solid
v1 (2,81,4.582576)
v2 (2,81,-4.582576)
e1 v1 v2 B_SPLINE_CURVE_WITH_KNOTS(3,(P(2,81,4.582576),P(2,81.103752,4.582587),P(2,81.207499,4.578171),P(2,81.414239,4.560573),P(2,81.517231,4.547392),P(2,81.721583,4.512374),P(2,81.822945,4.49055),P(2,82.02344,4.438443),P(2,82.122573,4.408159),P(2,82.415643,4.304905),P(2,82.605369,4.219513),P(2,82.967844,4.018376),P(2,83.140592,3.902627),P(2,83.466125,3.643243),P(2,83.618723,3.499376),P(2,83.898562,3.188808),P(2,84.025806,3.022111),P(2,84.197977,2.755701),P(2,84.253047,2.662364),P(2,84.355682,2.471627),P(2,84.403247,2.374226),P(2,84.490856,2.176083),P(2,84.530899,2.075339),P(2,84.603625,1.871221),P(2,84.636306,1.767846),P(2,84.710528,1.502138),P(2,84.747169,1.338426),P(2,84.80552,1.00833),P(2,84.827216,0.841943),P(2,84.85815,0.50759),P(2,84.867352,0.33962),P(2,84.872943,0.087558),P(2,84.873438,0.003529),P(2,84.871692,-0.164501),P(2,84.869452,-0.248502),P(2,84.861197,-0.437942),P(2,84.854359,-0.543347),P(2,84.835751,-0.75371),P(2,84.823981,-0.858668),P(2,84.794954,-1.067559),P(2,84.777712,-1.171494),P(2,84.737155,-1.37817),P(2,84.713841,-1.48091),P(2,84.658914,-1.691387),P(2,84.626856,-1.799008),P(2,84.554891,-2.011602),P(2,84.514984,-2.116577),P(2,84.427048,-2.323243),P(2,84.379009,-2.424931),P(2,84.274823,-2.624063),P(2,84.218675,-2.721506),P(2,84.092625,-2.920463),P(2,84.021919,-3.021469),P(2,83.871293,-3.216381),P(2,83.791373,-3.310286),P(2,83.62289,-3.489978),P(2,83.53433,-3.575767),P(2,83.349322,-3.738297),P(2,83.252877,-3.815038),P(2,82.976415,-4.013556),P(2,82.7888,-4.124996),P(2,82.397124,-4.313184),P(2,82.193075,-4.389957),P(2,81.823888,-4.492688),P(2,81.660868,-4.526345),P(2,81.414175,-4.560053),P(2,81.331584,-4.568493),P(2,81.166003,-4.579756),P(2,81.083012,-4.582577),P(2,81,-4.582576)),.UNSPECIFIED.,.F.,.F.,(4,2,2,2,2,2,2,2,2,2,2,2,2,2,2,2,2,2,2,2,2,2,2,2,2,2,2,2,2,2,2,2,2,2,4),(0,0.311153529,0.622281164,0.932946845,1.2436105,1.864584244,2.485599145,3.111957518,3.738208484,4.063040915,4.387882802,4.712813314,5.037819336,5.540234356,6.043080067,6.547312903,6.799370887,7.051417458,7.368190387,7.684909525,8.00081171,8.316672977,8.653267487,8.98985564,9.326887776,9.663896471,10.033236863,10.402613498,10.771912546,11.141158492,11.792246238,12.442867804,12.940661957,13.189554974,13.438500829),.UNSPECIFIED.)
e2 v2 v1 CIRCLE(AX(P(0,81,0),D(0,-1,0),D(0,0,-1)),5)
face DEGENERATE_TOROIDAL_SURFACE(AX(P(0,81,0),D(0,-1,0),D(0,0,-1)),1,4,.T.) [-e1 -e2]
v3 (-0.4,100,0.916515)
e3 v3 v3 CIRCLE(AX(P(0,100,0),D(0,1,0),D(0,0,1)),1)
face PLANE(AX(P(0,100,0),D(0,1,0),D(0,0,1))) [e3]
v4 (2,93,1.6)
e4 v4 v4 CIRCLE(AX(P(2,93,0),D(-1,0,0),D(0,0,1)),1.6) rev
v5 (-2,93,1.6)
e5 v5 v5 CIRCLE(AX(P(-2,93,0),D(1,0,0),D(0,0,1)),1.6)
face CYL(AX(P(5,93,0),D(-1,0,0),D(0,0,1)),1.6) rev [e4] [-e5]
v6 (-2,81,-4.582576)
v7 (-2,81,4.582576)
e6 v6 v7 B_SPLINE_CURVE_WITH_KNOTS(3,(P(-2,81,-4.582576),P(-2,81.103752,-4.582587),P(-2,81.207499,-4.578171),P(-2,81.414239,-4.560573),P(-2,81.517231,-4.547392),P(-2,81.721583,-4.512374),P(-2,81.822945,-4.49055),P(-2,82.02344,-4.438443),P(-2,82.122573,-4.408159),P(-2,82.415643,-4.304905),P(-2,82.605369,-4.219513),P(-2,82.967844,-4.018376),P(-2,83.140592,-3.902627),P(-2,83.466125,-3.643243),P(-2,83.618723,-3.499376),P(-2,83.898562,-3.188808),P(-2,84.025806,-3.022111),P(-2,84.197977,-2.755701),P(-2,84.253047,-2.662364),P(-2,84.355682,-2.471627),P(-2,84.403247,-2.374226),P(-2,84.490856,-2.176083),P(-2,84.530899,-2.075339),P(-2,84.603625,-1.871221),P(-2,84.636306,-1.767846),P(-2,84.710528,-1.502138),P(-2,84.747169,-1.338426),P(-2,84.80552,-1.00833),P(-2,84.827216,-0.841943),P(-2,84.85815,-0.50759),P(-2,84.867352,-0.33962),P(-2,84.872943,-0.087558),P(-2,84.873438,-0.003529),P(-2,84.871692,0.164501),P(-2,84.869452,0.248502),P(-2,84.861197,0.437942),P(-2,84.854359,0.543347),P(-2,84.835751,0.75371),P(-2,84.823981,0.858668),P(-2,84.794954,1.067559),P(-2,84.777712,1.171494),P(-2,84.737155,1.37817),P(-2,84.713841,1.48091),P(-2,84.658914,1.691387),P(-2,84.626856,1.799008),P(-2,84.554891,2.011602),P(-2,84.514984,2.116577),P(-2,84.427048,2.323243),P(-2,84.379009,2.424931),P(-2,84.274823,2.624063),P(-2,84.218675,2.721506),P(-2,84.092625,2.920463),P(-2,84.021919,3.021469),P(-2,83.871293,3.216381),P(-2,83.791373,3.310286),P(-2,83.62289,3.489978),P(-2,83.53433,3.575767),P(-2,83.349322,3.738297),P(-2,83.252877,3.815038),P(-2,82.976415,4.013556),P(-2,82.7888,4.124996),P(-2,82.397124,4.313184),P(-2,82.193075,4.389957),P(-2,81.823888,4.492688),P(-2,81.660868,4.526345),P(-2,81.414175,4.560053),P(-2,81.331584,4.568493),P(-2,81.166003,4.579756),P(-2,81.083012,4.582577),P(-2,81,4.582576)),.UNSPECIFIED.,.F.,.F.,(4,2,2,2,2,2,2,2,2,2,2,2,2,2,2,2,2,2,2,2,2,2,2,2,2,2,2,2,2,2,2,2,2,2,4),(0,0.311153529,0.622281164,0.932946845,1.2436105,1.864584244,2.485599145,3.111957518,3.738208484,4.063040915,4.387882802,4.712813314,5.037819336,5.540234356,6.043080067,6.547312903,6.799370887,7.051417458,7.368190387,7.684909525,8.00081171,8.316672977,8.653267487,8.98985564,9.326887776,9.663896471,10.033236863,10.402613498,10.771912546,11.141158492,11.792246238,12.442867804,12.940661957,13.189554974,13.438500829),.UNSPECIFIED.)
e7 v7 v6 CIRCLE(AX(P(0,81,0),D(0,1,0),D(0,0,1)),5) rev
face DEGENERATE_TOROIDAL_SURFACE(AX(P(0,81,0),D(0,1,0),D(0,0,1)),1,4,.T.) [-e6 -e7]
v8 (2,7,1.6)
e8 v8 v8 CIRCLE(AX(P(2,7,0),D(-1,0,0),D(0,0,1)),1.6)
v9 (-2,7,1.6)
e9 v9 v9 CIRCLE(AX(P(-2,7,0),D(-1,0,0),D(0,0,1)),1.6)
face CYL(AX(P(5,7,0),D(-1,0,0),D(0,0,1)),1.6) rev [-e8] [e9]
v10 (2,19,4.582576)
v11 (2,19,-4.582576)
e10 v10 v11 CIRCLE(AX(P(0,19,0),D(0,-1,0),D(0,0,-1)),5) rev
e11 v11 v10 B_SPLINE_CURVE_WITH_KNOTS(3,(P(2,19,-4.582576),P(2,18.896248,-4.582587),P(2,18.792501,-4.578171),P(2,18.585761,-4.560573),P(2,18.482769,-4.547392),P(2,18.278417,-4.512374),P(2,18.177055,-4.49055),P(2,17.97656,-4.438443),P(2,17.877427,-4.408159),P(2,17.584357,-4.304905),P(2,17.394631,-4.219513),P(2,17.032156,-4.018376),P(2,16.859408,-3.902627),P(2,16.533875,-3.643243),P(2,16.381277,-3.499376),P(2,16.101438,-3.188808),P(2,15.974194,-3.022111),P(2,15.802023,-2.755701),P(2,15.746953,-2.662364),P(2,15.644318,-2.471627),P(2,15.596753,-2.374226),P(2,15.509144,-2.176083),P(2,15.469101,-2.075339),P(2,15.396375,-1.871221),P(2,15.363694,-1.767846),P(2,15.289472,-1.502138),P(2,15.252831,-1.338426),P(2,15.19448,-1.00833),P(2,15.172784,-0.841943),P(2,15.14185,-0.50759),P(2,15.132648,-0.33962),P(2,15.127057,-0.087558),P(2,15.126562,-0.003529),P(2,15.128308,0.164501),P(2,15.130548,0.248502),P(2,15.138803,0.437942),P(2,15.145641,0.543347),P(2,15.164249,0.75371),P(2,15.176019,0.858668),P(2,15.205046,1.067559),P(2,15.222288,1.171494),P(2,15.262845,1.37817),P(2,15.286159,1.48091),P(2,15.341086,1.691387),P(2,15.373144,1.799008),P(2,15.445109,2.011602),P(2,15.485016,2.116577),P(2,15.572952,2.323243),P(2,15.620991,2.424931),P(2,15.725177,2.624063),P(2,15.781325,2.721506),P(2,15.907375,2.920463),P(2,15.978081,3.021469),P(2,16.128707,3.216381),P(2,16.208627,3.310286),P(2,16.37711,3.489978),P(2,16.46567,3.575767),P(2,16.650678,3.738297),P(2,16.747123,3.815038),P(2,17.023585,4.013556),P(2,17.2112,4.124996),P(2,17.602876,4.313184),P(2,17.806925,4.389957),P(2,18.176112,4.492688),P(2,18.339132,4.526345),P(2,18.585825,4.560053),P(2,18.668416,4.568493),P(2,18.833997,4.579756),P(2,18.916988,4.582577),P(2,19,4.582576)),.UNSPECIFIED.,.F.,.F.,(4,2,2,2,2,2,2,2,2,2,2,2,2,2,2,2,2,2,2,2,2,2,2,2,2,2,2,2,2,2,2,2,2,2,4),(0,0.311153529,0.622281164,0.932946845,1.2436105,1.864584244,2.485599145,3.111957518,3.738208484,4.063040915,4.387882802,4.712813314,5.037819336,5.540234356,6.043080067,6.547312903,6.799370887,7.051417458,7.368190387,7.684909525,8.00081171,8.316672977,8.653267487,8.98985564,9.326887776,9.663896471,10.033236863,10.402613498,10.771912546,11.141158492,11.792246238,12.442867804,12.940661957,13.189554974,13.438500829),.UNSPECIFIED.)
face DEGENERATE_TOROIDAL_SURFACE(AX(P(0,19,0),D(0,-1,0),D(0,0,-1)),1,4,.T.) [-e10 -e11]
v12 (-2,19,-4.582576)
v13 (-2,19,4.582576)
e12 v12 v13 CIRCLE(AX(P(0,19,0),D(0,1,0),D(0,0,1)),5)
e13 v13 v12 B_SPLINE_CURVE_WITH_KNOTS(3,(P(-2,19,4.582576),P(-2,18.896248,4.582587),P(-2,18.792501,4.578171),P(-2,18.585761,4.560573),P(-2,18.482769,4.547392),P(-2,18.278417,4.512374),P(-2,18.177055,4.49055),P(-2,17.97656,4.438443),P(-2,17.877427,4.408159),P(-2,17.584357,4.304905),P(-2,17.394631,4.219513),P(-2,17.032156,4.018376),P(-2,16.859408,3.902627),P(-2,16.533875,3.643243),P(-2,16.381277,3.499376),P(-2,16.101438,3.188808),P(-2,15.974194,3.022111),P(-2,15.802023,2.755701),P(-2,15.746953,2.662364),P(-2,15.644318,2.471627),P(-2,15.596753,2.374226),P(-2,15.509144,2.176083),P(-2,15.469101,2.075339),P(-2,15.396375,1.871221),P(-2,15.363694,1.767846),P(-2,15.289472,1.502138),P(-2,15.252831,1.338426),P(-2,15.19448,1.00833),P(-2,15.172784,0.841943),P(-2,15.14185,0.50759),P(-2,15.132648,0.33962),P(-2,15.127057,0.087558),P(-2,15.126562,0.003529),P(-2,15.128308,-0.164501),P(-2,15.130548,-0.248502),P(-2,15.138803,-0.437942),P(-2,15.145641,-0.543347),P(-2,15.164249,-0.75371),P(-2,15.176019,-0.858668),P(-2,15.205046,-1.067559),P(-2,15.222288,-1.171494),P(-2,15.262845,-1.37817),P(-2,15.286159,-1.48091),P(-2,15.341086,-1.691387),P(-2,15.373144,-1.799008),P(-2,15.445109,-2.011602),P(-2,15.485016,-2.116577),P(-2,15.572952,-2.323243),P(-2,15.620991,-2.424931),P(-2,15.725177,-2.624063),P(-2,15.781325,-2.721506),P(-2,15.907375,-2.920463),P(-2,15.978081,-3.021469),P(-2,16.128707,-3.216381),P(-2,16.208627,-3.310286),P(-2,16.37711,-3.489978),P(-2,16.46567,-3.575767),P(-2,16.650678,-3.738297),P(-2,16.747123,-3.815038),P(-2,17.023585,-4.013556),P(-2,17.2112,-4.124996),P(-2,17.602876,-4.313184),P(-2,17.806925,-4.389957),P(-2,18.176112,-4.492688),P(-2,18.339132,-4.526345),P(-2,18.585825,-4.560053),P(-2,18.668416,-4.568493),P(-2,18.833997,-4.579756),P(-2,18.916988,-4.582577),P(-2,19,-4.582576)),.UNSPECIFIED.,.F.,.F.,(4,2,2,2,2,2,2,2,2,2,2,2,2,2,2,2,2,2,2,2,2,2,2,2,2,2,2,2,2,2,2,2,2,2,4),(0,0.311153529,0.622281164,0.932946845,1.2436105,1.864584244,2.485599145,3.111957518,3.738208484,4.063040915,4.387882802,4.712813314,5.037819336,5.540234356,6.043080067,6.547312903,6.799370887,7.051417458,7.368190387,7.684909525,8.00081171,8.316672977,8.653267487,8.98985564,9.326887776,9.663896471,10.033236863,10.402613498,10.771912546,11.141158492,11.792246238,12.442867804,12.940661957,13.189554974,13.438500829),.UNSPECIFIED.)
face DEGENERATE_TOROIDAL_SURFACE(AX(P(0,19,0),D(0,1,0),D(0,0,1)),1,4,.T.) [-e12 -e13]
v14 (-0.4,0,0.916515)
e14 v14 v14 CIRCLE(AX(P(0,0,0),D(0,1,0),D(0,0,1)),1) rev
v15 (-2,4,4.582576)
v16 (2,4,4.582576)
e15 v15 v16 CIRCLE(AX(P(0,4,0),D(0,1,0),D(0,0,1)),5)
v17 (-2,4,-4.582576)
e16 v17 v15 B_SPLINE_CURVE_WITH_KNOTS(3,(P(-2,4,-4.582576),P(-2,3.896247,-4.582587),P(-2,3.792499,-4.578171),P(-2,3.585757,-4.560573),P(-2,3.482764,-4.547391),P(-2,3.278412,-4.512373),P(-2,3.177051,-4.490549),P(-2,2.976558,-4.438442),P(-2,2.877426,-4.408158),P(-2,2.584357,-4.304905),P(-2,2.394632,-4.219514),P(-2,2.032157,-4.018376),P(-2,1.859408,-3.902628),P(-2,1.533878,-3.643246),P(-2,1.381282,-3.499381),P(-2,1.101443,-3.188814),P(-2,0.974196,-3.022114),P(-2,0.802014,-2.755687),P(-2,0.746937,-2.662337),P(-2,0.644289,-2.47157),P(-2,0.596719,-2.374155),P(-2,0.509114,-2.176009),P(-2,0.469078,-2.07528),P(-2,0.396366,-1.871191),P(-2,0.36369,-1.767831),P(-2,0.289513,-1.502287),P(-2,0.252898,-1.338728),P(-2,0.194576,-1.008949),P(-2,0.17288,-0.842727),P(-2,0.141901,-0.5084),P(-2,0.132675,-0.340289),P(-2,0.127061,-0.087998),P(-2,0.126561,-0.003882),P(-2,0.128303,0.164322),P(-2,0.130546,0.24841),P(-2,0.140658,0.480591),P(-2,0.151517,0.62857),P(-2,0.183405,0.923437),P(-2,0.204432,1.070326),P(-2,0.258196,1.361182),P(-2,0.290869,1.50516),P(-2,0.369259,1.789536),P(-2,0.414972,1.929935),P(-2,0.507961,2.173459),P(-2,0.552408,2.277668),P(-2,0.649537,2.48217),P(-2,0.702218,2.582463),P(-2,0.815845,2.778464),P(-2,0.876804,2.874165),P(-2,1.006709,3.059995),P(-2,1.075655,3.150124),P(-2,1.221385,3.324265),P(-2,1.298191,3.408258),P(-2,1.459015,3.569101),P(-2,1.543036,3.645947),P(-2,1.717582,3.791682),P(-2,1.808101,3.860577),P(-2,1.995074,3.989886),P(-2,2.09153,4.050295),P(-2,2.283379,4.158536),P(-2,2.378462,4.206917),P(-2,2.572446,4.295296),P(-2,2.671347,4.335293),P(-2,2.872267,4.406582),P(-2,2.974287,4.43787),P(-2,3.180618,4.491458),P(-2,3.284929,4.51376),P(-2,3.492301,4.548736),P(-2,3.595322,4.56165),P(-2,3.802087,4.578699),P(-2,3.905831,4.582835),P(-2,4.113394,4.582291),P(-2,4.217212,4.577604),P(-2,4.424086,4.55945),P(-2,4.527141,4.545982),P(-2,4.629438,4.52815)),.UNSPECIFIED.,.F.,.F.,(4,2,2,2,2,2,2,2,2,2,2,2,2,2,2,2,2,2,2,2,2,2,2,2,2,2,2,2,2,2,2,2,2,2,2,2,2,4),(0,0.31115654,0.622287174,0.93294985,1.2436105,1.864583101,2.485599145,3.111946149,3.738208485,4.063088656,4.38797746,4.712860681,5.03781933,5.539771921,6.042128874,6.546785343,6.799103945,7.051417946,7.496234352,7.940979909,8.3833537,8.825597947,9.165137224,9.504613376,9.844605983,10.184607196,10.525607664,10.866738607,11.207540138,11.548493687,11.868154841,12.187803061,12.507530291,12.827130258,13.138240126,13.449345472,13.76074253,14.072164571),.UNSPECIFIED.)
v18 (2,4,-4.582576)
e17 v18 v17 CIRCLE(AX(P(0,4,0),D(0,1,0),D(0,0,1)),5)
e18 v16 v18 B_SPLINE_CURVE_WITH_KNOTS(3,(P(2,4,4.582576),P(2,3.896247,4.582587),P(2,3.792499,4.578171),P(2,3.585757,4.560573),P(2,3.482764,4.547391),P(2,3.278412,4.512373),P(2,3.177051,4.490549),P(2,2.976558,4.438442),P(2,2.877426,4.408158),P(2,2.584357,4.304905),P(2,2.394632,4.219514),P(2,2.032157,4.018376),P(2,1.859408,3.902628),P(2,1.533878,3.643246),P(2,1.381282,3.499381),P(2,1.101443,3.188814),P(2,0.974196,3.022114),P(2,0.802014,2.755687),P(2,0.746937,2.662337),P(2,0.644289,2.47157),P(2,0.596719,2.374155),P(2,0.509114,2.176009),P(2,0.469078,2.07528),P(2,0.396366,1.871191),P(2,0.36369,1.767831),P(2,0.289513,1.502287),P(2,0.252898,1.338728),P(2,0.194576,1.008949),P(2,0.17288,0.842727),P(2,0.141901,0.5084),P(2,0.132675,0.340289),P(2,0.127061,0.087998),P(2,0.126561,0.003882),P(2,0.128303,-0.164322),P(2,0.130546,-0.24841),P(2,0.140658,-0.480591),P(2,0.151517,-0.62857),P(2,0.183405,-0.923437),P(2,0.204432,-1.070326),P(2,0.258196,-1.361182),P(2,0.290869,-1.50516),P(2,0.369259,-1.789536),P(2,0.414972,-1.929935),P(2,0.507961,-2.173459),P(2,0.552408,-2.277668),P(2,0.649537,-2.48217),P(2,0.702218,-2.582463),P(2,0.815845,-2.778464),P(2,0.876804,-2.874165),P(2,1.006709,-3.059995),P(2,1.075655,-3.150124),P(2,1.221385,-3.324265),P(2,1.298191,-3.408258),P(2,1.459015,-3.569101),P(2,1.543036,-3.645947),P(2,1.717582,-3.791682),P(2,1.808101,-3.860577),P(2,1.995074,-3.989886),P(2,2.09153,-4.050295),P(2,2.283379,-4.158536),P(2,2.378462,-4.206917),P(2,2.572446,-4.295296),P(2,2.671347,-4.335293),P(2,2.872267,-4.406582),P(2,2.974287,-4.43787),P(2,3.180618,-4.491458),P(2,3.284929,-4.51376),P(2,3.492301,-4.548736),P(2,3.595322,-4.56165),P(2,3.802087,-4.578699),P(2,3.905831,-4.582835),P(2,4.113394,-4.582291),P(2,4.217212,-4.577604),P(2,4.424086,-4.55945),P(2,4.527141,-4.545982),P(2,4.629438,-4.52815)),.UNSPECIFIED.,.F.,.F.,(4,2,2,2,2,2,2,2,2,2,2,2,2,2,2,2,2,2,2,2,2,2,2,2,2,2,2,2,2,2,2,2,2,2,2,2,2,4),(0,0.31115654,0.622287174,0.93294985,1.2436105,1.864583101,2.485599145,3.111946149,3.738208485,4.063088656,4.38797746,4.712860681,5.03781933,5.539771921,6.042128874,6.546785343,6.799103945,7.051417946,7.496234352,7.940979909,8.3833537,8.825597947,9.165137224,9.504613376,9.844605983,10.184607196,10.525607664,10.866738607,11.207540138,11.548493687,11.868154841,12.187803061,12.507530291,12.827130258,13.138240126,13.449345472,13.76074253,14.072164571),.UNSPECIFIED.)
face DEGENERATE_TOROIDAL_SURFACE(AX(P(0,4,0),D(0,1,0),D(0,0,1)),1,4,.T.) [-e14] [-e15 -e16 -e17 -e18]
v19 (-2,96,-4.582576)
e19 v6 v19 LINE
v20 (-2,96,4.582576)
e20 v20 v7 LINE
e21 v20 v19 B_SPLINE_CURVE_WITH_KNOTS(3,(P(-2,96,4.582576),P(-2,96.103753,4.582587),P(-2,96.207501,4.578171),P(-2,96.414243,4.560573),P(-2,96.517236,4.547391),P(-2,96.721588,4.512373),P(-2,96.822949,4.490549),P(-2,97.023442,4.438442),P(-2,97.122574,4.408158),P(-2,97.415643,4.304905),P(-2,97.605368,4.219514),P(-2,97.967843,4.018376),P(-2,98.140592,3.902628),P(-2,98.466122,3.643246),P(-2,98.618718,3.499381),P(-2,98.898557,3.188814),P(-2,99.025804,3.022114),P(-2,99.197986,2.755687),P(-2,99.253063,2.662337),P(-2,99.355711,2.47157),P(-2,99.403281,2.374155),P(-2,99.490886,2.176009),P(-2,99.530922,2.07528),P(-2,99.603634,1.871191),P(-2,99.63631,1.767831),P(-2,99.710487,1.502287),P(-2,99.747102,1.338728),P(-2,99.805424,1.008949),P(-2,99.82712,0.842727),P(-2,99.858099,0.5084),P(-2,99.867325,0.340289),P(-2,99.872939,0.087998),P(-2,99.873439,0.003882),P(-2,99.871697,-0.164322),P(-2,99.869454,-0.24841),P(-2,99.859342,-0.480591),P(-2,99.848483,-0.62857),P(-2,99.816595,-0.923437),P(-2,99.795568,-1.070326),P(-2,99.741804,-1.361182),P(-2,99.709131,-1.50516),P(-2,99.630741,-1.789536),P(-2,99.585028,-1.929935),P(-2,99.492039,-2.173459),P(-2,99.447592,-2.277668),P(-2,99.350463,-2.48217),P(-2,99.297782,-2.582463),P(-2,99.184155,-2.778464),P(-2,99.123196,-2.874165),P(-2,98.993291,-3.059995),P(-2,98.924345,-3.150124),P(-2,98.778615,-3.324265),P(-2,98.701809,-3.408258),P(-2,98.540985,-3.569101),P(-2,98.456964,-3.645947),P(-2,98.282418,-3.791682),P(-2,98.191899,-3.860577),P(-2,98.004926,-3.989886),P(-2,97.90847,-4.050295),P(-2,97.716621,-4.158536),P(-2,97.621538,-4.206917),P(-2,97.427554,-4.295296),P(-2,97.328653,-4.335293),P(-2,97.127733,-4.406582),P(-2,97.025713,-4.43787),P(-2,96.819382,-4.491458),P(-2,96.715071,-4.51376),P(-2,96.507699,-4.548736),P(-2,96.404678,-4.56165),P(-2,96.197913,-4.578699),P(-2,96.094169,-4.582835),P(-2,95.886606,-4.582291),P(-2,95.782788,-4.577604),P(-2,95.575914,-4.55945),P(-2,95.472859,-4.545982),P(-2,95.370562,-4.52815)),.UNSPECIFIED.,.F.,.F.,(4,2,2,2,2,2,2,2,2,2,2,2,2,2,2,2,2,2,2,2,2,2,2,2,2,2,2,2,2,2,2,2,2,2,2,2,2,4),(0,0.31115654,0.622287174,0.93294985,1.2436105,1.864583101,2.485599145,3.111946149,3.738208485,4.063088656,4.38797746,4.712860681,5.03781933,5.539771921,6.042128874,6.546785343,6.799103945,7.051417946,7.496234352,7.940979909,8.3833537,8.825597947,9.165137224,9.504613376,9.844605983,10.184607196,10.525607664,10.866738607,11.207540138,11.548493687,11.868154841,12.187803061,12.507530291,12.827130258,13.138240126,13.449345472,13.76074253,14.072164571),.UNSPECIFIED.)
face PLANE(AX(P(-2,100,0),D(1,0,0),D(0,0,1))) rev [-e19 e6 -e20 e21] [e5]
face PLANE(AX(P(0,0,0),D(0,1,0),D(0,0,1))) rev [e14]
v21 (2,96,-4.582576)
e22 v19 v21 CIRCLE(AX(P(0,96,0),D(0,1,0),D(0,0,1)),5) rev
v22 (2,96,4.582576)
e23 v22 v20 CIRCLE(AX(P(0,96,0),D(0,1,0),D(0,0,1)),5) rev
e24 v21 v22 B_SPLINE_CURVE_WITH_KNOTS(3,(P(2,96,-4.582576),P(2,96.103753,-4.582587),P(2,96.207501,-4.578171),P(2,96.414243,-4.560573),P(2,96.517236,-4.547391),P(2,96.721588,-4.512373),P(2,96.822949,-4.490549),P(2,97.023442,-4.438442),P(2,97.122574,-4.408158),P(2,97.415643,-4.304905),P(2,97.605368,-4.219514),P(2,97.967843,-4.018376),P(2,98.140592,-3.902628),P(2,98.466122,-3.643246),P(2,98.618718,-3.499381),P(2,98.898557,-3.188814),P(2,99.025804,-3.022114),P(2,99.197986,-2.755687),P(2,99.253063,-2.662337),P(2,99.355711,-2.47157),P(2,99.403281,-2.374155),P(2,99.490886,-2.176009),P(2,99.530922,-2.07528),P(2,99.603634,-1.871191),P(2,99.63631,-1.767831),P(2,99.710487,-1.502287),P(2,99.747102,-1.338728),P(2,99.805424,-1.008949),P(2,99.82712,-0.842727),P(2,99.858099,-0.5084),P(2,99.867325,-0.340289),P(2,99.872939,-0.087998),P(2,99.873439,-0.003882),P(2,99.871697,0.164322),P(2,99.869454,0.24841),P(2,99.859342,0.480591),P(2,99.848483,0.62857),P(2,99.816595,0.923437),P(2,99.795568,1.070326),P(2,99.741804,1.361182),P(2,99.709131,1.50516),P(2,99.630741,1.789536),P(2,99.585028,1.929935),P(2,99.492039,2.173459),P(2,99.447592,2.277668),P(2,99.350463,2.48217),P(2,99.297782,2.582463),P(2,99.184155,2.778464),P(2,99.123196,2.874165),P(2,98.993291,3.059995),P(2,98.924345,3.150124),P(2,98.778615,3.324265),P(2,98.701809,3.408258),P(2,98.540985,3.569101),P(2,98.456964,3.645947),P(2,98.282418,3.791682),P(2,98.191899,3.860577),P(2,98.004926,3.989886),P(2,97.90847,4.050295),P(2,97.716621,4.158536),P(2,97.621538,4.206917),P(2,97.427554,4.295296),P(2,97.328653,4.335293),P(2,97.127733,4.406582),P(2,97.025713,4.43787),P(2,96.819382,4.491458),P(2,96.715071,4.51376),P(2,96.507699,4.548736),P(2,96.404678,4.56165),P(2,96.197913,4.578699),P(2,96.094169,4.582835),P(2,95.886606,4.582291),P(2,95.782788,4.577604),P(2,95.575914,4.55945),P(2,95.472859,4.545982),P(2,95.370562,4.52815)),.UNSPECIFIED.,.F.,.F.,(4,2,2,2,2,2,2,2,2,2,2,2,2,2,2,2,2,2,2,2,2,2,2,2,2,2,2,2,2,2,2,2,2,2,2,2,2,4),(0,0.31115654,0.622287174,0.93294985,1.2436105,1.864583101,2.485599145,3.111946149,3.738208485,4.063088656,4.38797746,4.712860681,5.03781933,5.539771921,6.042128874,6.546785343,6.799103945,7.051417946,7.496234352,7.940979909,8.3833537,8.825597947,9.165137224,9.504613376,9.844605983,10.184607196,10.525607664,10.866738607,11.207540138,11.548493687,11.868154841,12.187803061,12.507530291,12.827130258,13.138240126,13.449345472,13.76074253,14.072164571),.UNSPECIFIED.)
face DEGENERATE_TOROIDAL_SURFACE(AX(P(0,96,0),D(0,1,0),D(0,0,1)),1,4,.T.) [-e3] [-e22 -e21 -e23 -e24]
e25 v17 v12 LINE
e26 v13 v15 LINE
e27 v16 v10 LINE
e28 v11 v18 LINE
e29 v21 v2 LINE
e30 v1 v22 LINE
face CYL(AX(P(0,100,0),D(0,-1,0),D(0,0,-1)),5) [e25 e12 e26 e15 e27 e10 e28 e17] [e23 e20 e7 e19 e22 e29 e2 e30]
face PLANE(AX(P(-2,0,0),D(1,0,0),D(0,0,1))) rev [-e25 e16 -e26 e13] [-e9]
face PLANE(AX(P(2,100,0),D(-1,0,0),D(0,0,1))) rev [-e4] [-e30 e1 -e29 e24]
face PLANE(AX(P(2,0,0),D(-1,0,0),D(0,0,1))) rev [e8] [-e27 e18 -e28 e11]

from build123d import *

# Parameters (mm, degrees)
SKETCH10_R              = 5
BOSS_EXTRUDE1_DEPTH     = 100
SKETCH11_W              = 10
SKETCH11_H              = 15
CUT_EXTRUDE1_DEPTH      = 100
SKETCH12_R              = 1.6
CUT_EXTRUDE2_DEPTH      = 101.369318021
MIRROR8_COPY_1_SKETCH_W = 10
MIRROR8_COPY_1_SKETCH_H = 15
MIRROR8_COPY_1_DEPTH    = 100
MIRROR8_COPY_2_SKETCH_W = 10
MIRROR8_COPY_2_SKETCH_H = 15
MIRROR8_COPY_2_DEPTH    = 100
FILLET1_R               = 4
FILLET2_R               = 4


with BuildPart() as part:
    # Sketch10 → Boss-Extrude1 (new body)
    with BuildSketch(Plane(origin=(0, 0, 0), x_dir=(1, 0, 0), z_dir=(0, 1, 0))):
        with Locations(Location((0, 0, 0), (0, 0, 270))):
            Circle(SKETCH10_R)
    extrude(amount=BOSS_EXTRUDE1_DEPTH)

    # Sketch11 → Cut-Extrude1 (cut)
    with BuildSketch(Plane(origin=(2, 0, 0), x_dir=(0, 0, -1), z_dir=(1, 0, 0))):
        with Locations((0, 7.5)):
            Rectangle(SKETCH11_W, SKETCH11_H)
    cut_extrude1 = extrude(amount=CUT_EXTRUDE1_DEPTH, mode=Mode.SUBTRACT)

    # Mirror1: Cut-Extrude1 across plane
    add(cut_extrude1.mirror(Plane(origin=(0, 0, 0), x_dir=(0, 0, 1), z_dir=(1, 0, 0))), mode=Mode.SUBTRACT)

    # Sketch12 → Cut-Extrude2 (cut, through all)
    with BuildSketch(Plane.ZY.offset(2)):
        with Locations((0, 7)):
            Circle(SKETCH12_R)
    cut_extrude2 = extrude(amount=-CUT_EXTRUDE2_DEPTH, mode=Mode.SUBTRACT)

    # Mirror7: Cut-Extrude1 across plane
    add(cut_extrude1.mirror(Plane(origin=(0, 50, 0), x_dir=(0, 0, 1), z_dir=(0, -1, 0))), mode=Mode.SUBTRACT)

    # Mirror8 copy 1 sketch → Mirror8 copy 1 (cut)
    with BuildSketch(Plane(origin=(-2, 100, 0), x_dir=(0, 0, -1), z_dir=(-1, 0, 0))):
        with Locations((0, 7.5)):
            Rectangle(MIRROR8_COPY_1_SKETCH_W, MIRROR8_COPY_1_SKETCH_H)
    extrude(amount=MIRROR8_COPY_1_DEPTH, mode=Mode.SUBTRACT)

    # Mirror8 copy 2 sketch → Mirror8 copy 2 (cut)
    with BuildSketch(Plane(origin=(2, 100, 0), x_dir=(0, 0, -1), z_dir=(1, 0, 0))):
        with Locations((0, -7.5)):
            Rectangle(MIRROR8_COPY_2_SKETCH_W, MIRROR8_COPY_2_SKETCH_H)
    extrude(amount=MIRROR8_COPY_2_DEPTH, mode=Mode.SUBTRACT)

    # Mirror9: Cut-Extrude2 across plane
    add(cut_extrude2.mirror(Plane(origin=(0, 50, 0), x_dir=(0, 0, 1), z_dir=(0, -1, 0))), mode=Mode.SUBTRACT)

    # Fillet1
    # the kernel refuses this fillet: 4 mm, written as the material it takes off along each edge
    with BuildSketch(Plane(origin=(0, 15, 0), x_dir=(0.9999950652018581, 0, 0.003141587485879613), z_dir=(0.003141587485879613, 0, -0.9999950652018581))) as fillet1_piece_1_section:
        with BuildLine():
            CenterArc((5 - FILLET1_R, -FILLET1_R), FILLET1_R, 0, 90)
            Line((5 - FILLET1_R, 0), (5, 0))
            Line((5, 0), (5, -FILLET1_R))
        make_face()
    fillet1_piece_1 = revolve(axis=Axis((0, 15, 0), (0, -1, 0)), revolution_arc=359.64, mode=Mode.PRIVATE)
    fillet1_piece_1 = split(fillet1_piece_1, bisect_by=Plane(origin=(2, 16.020930517, 2.132715254), z_dir=(1, 0, 0)), keep=Keep.TOP, mode=Mode.PRIVATE)
    add(fillet1_piece_1, mode=Mode.SUBTRACT)
    with BuildSketch(Plane(origin=(0, 15, 0), x_dir=(0.9999950652018581, 0, 0.003141587485879613), z_dir=(0.003141587485879613, 0, -0.9999950652018581))) as fillet1_piece_2_section:
        with BuildLine():
            CenterArc((5 - FILLET1_R, -FILLET1_R), FILLET1_R, 0, 90)
            Line((5 - FILLET1_R, 0), (5, 0))
            Line((5, 0), (5, -FILLET1_R))
        make_face()
    fillet1_piece_2 = revolve(axis=Axis((0, 15, 0), (0, -1, 0)), revolution_arc=359.64, mode=Mode.PRIVATE)
    fillet1_piece_2 = split(fillet1_piece_2, bisect_by=Plane(origin=(-2, 16.531416738, 0), z_dir=(-1, 0, 0)), keep=Keep.TOP, mode=Mode.PRIVATE)
    add(fillet1_piece_2, mode=Mode.SUBTRACT)
    with BuildSketch(Plane(origin=(0, 15, 0), x_dir=(-0.9999950652018581, 0, -0.0031415874858794907), z_dir=(-0.0031415874858794907, 0, 0.9999950652018581))) as fillet1_piece_3_section:
        with BuildLine():
            CenterArc((5 - FILLET1_R, -FILLET1_R), FILLET1_R, 0, 90)
            Line((5 - FILLET1_R, 0), (5, 0))
            Line((5, 0), (5, -FILLET1_R))
        make_face()
    fillet1_piece_3 = revolve(axis=Axis((0, 15, 0), (0, -1, 0)), revolution_arc=359.64, mode=Mode.PRIVATE)
    fillet1_piece_3 = split(fillet1_piece_3, bisect_by=Plane(origin=(-2, 16.020930615, -2.132715254), z_dir=(-1, 0, 0)), keep=Keep.TOP, mode=Mode.PRIVATE)
    add(fillet1_piece_3, mode=Mode.SUBTRACT)
    with BuildSketch(Plane(origin=(0, 15, 0), x_dir=(-0.9999950652018581, 0, -0.0031415874858794907), z_dir=(-0.0031415874858794907, 0, 0.9999950652018581))) as fillet1_piece_4_section:
        with BuildLine():
            CenterArc((5 - FILLET1_R, -FILLET1_R), FILLET1_R, 0, 90)
            Line((5 - FILLET1_R, 0), (5, 0))
            Line((5, 0), (5, -FILLET1_R))
        make_face()
    fillet1_piece_4 = revolve(axis=Axis((0, 15, 0), (0, -1, 0)), revolution_arc=359.64, mode=Mode.PRIVATE)
    fillet1_piece_4 = split(fillet1_piece_4, bisect_by=Plane(origin=(2, 16.531416738, 0), z_dir=(1, 0, 0)), keep=Keep.TOP, mode=Mode.PRIVATE)
    add(fillet1_piece_4, mode=Mode.SUBTRACT)
    with BuildSketch(Plane(origin=(0, 85, 0), x_dir=(-0.9999950652018581, 0, -0.0031415874858794907), z_dir=(-0.0031415874858794907, 0, 0.9999950652018581))) as fillet1_piece_5_section:
        with BuildLine():
            CenterArc((5 - FILLET1_R, FILLET1_R), FILLET1_R, 270, 90)
            Line((5 - FILLET1_R, 0), (5, 0))
            Line((5, 0), (5, FILLET1_R))
        make_face()
    fillet1_piece_5 = revolve(axis=Axis((0, 85, 0), (0, -1, 0)), revolution_arc=359.64, mode=Mode.PRIVATE)
    fillet1_piece_5 = split(fillet1_piece_5, bisect_by=Plane(origin=(-2, 83.979069385, -2.132715254), z_dir=(-1, 0, 0)), keep=Keep.TOP, mode=Mode.PRIVATE)
    add(fillet1_piece_5, mode=Mode.SUBTRACT)
    with BuildSketch(Plane(origin=(0, 85, 0), x_dir=(-0.9999950652018581, 0, -0.0031415874858794907), z_dir=(-0.0031415874858794907, 0, 0.9999950652018581))) as fillet1_piece_6_section:
        with BuildLine():
            CenterArc((5 - FILLET1_R, FILLET1_R), FILLET1_R, 270, 90)
            Line((5 - FILLET1_R, 0), (5, 0))
            Line((5, 0), (5, FILLET1_R))
        make_face()
    fillet1_piece_6 = revolve(axis=Axis((0, 85, 0), (0, -1, 0)), revolution_arc=359.64, mode=Mode.PRIVATE)
    fillet1_piece_6 = split(fillet1_piece_6, bisect_by=Plane(origin=(2, 83.468583262, 0), z_dir=(1, 0, 0)), keep=Keep.TOP, mode=Mode.PRIVATE)
    add(fillet1_piece_6, mode=Mode.SUBTRACT)
    with BuildSketch(Plane(origin=(0, 85, 0), x_dir=(0.9999950652018581, 0, 0.003141587485879613), z_dir=(0.003141587485879613, 0, -0.9999950652018581))) as fillet1_piece_7_section:
        with BuildLine():
            CenterArc((5 - FILLET1_R, FILLET1_R), FILLET1_R, 270, 90)
            Line((5 - FILLET1_R, 0), (5, 0))
            Line((5, 0), (5, FILLET1_R))
        make_face()
    fillet1_piece_7 = revolve(axis=Axis((0, 85, 0), (0, -1, 0)), revolution_arc=359.64, mode=Mode.PRIVATE)
    fillet1_piece_7 = split(fillet1_piece_7, bisect_by=Plane(origin=(2, 83.979069483, 2.132715254), z_dir=(1, 0, 0)), keep=Keep.TOP, mode=Mode.PRIVATE)
    add(fillet1_piece_7, mode=Mode.SUBTRACT)
    with BuildSketch(Plane(origin=(0, 85, 0), x_dir=(0.9999950652018581, 0, 0.003141587485879613), z_dir=(0.003141587485879613, 0, -0.9999950652018581))) as fillet1_piece_8_section:
        with BuildLine():
            CenterArc((5 - FILLET1_R, FILLET1_R), FILLET1_R, 270, 90)
            Line((5 - FILLET1_R, 0), (5, 0))
            Line((5, 0), (5, FILLET1_R))
        make_face()
    fillet1_piece_8 = revolve(axis=Axis((0, 85, 0), (0, -1, 0)), revolution_arc=359.64, mode=Mode.PRIVATE)
    fillet1_piece_8 = split(fillet1_piece_8, bisect_by=Plane(origin=(-2, 83.468583262, 0), z_dir=(-1, 0, 0)), keep=Keep.TOP, mode=Mode.PRIVATE)
    add(fillet1_piece_8, mode=Mode.SUBTRACT)

    # Fillet2
    # the kernel refuses this fillet: 4 mm, written as the material it takes off along each edge
    with BuildSketch(Plane(origin=(0, 0, 0), x_dir=(-0.6668850456417628, 0, -0.7451606108077533), z_dir=(0.7451606108077533, 0, -0.6668850456417628))) as fillet2_piece_1:
        with BuildLine():
            CenterArc((5 - FILLET2_R, FILLET2_R), FILLET2_R, 270, 90)
            Line((5 - FILLET2_R, 0), (5, 0))
            Line((5, 0), (5, FILLET2_R))
        make_face()
    revolve(axis=Axis((0, 0, 0), (0, 1, 0)), revolution_arc=138.172896035, mode=Mode.SUBTRACT)
    with BuildSketch(Plane(origin=(0, 0, 0), x_dir=(0.6667617921571638, 0, 0.7452708987471381), z_dir=(-0.7452708987471381, 0, 0.6667617921571638))) as fillet2_piece_2:
        with BuildLine():
            CenterArc((5 - FILLET2_R, FILLET2_R), FILLET2_R, 270, 90)
            Line((5 - FILLET2_R, 0), (5, 0))
            Line((5, 0), (5, FILLET2_R))
        make_face()
    revolve(axis=Axis((0, 0, 0), (0, 1, 0)), revolution_arc=276.364744713, mode=Mode.SUBTRACT)
    with BuildSketch(Plane(origin=(0, 100, 0), x_dir=(-0.6668850456417623, 0, -0.7451606108077536), z_dir=(0.7451606108077536, 0, -0.6668850456417623))) as fillet2_piece_3:
        with BuildLine():
            CenterArc((5 - FILLET2_R, -FILLET2_R), FILLET2_R, 0, 90)
            Line((5 - FILLET2_R, 0), (5, 0))
            Line((5, 0), (5, -FILLET2_R))
        make_face()
    revolve(axis=Axis((0, 100, 0), (0, 1, 0)), revolution_arc=138.172896035, mode=Mode.SUBTRACT)
    with BuildSketch(Plane(origin=(0, 100, 0), x_dir=(0.6667617921571635, 0, 0.7452708987471385), z_dir=(-0.7452708987471385, 0, 0.6667617921571635))) as fillet2_piece_4:
        with BuildLine():
            CenterArc((5 - FILLET2_R, -FILLET2_R), FILLET2_R, 0, 90)
            Line((5 - FILLET2_R, 0), (5, 0))
            Line((5, 0), (5, -FILLET2_R))
        make_face()
    revolve(axis=Axis((0, 100, 0), (0, 1, 0)), revolution_arc=276.364744713, mode=Mode.SUBTRACT)
    with BuildSketch(Plane(origin=(0, 100, 0), x_dir=(0, 0, 1), z_dir=(-1, 0, 0))) as fillet2_piece_5:
        with BuildLine():
            CenterArc((5 - FILLET2_R, -FILLET2_R), FILLET2_R, 0, 90)
            Line((5 - FILLET2_R, 0), (5, 0))
            Line((5, 0), (5, -FILLET2_R))
        make_face()
    revolve(axis=Axis((0, 100, 0), (0, 1, 0)), revolution_arc=138.172896035, mode=Mode.SUBTRACT)
    with BuildSketch(Plane(origin=(0, 0, 0), x_dir=(0, 0, 1), z_dir=(-1, 0, 0))) as fillet2_piece_6:
        with BuildLine():
            CenterArc((5 - FILLET2_R, FILLET2_R), FILLET2_R, 270, 90)
            Line((5 - FILLET2_R, 0), (5, 0))
            Line((5, 0), (5, FILLET2_R))
        make_face()
    revolve(axis=Axis((0, 0, 0), (0, 1, 0)), revolution_arc=138.172896035, mode=Mode.SUBTRACT)


solid = part.part
